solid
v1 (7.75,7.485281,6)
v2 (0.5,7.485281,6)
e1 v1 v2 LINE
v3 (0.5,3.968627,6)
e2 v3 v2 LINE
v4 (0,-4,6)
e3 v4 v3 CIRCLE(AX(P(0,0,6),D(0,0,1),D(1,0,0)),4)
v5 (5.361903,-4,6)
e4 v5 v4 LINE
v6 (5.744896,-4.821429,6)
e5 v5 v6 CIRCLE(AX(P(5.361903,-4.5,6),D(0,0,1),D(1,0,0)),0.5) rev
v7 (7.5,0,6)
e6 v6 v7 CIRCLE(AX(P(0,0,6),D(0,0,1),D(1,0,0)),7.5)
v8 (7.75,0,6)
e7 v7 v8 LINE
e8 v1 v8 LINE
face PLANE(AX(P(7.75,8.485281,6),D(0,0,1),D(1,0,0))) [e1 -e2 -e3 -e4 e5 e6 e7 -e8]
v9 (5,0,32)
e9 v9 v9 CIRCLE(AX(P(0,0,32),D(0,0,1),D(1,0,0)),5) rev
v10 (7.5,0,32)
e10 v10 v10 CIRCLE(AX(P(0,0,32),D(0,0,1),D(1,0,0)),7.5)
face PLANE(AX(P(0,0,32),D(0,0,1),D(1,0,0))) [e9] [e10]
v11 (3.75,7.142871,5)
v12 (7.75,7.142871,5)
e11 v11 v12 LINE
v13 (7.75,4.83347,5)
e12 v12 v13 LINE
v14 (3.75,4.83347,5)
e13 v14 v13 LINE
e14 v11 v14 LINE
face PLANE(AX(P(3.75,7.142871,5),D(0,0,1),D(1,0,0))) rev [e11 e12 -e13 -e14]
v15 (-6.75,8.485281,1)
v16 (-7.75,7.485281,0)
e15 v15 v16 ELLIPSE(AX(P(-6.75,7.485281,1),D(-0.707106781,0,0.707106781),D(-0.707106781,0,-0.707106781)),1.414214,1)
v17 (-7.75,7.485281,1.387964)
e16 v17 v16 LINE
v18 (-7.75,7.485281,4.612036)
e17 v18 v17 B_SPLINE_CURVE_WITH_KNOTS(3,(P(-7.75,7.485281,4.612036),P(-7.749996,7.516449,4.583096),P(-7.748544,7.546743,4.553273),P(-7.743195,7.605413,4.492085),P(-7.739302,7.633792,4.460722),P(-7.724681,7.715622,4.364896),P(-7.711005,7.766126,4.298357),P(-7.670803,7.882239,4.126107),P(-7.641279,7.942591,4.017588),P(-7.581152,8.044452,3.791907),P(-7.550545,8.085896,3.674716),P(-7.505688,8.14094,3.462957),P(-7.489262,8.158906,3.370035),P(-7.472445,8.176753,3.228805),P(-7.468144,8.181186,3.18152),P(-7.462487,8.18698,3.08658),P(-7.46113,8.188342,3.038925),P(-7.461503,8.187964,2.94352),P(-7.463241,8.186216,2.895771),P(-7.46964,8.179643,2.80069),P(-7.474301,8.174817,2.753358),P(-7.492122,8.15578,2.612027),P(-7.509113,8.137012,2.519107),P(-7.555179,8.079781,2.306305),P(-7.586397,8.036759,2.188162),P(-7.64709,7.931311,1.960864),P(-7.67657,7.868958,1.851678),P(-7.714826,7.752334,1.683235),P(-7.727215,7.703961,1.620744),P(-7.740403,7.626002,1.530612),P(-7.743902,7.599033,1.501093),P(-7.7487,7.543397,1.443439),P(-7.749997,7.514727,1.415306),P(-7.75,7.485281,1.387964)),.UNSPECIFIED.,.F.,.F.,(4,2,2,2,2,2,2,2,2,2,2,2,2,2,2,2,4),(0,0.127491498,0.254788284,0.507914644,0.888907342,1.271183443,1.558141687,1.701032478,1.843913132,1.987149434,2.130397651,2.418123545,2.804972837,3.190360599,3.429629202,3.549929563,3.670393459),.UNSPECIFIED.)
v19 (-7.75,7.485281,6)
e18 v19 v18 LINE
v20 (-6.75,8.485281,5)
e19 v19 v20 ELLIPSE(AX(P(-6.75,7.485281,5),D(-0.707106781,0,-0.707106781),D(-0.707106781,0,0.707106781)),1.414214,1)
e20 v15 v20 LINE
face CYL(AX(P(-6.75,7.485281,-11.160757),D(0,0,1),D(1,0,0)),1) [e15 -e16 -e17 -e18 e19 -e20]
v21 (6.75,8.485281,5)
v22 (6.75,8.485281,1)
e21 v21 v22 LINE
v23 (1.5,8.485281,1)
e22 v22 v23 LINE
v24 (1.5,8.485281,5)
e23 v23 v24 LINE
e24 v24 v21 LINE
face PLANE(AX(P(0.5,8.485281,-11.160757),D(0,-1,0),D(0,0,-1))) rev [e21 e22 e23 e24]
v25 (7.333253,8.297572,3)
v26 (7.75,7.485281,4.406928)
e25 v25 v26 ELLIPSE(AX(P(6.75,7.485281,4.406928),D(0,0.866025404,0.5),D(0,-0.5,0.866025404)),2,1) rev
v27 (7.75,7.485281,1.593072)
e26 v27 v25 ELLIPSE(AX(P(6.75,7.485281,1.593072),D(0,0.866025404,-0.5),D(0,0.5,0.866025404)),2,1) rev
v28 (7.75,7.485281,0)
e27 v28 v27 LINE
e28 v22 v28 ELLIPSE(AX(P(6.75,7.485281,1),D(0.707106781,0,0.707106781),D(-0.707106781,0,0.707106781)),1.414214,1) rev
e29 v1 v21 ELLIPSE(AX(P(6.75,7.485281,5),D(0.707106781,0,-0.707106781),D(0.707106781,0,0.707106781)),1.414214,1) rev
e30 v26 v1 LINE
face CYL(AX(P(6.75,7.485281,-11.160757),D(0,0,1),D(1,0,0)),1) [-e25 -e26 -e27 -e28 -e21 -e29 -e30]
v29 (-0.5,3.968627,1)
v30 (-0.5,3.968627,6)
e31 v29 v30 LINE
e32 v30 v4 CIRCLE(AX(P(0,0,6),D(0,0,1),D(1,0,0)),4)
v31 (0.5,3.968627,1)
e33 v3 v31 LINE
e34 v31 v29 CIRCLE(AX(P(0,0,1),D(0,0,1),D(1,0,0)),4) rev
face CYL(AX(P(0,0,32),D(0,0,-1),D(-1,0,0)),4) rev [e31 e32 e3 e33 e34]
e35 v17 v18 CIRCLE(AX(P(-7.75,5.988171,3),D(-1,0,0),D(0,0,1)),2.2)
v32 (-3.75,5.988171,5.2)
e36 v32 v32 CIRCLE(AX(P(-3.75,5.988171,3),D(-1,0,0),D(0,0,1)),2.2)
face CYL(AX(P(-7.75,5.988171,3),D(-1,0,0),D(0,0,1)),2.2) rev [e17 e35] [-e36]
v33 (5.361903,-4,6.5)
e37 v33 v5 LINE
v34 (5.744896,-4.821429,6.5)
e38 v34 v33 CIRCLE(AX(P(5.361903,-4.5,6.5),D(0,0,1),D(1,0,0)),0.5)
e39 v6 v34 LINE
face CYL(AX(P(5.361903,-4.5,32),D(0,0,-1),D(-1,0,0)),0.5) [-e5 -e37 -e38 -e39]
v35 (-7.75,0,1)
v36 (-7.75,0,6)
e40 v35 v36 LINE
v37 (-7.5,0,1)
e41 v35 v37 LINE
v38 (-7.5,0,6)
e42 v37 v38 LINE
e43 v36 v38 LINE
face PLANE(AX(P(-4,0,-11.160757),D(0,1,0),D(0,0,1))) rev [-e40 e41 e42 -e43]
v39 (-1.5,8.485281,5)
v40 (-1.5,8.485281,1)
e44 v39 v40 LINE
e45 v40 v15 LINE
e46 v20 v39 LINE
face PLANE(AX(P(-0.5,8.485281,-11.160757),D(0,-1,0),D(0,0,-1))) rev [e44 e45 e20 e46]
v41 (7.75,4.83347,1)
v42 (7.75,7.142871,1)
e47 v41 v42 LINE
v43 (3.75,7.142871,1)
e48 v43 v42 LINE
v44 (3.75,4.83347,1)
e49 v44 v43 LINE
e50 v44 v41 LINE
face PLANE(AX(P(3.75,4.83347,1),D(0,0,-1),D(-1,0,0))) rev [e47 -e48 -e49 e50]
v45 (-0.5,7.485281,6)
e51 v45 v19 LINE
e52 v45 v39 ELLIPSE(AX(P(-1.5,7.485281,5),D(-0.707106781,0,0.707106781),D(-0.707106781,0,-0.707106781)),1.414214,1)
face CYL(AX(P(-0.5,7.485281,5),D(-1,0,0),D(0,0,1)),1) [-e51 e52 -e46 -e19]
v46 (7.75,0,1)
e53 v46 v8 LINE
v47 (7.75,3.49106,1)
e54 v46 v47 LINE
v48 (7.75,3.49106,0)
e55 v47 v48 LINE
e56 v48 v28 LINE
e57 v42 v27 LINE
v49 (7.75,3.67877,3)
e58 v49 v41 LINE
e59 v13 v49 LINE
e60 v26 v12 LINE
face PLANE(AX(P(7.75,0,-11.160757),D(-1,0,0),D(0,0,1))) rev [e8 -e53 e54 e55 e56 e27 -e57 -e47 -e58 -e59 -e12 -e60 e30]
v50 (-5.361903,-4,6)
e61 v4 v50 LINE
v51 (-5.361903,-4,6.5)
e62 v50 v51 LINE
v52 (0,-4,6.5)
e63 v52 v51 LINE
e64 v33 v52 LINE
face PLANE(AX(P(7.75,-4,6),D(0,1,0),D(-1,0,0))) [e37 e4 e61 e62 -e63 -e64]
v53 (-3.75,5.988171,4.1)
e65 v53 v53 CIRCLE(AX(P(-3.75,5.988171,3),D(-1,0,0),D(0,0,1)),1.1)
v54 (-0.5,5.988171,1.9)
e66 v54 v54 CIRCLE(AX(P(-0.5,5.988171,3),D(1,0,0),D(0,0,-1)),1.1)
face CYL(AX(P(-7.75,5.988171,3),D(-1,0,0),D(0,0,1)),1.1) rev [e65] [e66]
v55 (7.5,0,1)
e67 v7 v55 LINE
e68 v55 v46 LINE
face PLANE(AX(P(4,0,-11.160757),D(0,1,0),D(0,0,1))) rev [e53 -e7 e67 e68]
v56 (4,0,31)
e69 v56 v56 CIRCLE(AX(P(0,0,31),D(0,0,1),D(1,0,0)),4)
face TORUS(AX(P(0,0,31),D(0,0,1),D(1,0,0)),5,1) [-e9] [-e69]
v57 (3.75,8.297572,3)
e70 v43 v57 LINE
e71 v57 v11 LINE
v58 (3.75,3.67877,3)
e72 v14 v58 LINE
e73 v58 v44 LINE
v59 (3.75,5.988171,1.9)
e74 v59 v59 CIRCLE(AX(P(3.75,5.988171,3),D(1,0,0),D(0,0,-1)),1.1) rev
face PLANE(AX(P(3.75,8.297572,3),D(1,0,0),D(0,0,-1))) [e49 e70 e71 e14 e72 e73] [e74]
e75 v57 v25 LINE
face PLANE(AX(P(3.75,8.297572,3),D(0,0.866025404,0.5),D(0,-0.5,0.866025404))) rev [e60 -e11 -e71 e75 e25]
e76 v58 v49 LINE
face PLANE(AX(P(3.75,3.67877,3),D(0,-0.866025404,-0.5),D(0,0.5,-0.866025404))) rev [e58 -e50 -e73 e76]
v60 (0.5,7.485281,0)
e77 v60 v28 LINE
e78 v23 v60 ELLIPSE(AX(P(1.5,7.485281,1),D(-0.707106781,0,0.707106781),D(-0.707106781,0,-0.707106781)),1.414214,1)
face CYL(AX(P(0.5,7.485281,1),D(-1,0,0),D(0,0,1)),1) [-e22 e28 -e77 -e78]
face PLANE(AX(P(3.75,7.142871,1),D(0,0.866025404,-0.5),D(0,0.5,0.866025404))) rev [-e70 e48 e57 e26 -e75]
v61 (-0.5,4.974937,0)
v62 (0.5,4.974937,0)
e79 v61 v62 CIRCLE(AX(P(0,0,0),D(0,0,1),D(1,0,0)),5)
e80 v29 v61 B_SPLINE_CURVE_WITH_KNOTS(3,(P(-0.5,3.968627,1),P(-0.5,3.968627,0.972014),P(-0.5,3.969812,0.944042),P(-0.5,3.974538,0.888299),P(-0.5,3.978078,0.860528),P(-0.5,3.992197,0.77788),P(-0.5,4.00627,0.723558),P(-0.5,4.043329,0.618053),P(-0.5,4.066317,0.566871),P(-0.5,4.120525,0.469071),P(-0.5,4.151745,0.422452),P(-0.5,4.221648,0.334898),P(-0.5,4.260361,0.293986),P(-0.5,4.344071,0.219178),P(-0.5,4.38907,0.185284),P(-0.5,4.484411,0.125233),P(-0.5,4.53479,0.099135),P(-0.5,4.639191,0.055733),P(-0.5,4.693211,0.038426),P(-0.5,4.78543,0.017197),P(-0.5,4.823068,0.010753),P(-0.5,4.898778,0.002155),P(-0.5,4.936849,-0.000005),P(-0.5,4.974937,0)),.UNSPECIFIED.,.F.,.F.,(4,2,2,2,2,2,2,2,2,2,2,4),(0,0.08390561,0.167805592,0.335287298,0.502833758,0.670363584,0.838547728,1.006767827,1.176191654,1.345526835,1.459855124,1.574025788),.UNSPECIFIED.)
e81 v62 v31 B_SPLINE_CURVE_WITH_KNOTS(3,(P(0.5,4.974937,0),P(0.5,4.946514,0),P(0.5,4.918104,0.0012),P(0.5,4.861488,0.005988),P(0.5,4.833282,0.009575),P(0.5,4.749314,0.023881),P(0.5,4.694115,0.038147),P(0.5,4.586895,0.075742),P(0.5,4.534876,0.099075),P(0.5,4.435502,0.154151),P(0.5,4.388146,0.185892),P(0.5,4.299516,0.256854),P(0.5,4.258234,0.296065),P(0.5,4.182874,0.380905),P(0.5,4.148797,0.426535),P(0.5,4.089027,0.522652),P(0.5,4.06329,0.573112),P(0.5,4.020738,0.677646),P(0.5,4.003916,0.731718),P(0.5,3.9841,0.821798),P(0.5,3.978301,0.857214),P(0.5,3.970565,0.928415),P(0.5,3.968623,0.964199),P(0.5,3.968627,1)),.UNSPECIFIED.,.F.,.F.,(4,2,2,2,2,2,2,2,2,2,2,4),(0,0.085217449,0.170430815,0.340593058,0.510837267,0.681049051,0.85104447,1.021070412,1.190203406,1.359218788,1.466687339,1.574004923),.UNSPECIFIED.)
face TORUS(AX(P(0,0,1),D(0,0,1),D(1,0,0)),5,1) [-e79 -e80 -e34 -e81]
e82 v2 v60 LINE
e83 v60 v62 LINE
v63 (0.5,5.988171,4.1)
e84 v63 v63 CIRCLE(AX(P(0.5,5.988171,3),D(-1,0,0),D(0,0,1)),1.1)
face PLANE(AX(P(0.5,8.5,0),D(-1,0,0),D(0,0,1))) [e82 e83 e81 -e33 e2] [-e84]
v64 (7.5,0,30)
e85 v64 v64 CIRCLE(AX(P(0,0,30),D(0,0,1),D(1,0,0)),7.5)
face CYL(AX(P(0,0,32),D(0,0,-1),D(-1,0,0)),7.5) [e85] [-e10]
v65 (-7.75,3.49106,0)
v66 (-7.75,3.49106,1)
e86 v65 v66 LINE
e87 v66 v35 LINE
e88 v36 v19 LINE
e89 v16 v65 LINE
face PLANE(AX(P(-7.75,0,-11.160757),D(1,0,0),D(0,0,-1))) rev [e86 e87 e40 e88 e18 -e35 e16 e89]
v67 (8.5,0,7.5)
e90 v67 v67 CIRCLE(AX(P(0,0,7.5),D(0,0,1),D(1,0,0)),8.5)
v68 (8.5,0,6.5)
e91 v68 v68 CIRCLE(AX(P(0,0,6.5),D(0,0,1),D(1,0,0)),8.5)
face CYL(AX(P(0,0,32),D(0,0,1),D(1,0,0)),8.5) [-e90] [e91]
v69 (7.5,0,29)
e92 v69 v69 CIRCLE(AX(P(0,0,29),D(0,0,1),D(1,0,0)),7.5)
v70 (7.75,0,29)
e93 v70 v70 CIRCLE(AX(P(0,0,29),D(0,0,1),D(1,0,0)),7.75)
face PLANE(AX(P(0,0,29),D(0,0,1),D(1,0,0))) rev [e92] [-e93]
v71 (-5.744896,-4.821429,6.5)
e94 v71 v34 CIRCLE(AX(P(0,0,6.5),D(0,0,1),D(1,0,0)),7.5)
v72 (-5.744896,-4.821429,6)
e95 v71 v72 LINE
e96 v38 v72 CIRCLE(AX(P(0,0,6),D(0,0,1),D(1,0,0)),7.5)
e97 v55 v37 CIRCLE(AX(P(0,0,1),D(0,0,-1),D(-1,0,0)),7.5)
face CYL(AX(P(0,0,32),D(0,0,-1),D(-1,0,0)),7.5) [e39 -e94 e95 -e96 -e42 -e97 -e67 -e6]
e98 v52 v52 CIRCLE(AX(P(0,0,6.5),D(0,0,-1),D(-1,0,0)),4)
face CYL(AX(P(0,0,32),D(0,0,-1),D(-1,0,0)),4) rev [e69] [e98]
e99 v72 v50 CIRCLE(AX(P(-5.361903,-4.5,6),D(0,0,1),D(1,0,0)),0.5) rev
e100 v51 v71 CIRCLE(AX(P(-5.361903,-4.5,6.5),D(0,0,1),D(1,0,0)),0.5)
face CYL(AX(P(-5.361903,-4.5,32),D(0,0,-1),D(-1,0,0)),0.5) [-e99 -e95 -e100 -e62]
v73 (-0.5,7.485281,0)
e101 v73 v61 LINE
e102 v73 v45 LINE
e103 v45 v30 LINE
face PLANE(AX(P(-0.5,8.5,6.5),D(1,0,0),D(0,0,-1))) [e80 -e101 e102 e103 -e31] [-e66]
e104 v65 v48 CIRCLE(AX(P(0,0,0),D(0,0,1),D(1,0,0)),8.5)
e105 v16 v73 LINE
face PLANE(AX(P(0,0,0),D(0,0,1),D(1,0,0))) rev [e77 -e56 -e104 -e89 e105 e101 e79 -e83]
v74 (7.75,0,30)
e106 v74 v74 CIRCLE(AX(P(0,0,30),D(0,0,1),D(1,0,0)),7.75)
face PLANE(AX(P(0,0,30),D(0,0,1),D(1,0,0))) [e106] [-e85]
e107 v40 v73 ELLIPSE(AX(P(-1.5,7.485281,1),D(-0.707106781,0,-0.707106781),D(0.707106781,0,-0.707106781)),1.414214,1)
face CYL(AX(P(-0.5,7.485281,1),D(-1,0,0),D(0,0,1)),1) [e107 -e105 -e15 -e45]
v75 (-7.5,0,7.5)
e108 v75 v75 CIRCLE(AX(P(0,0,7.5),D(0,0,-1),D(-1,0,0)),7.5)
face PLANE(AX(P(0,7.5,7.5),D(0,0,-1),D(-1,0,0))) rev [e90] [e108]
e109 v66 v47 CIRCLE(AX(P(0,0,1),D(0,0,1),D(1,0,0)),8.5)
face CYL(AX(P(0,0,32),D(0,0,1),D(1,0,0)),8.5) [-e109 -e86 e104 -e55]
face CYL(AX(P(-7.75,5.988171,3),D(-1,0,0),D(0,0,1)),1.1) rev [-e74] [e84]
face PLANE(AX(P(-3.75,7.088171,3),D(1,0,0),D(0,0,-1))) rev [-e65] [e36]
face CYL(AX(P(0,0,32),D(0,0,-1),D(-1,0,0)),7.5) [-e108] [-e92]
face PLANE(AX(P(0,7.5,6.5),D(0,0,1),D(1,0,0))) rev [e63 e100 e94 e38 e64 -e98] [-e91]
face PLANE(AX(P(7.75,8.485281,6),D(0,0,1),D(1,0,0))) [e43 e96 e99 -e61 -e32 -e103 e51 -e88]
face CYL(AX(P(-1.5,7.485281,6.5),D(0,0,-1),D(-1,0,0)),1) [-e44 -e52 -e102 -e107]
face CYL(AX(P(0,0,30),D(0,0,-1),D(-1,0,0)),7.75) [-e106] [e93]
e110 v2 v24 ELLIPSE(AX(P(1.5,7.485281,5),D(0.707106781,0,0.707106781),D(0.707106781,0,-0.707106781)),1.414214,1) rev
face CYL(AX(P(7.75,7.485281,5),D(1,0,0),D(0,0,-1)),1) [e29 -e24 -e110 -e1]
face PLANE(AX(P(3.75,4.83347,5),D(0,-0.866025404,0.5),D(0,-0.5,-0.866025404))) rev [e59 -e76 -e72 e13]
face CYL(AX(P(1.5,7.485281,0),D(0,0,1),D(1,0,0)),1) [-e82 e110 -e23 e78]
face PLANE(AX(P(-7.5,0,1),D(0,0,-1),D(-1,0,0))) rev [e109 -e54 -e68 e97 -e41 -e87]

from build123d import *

# Parameters (mm, degrees)
SKETCH1_R                      = 7.5
SKETCH1_R_2                    = 4
BOSS_EXTRUDE1_DEPTH            = 32
SKETCH6_W                      = 1
SKETCH6_H                      = 1
SKETCH7_W                      = 1
SKETCH7_H                      = 1
CUT_EXTRUDE1_DEPTH             = 35.18332927
BOSS_EXTRUDE3_DEPTH            = 6.5
SKETCH15_W                     = 15.5
SKETCH15_H                     = 12.485281374
CUT_EXTRUDE2_DEPTH             = 0.5
CBORE_FOR_M2_SHCS1_D           = 2.2
CBORE_FOR_M2_SHCS1_CBORE_D     = 4.4
CBORE_FOR_M2_SHCS1_CBORE_DEPTH = 4
FILLET4_R                      = 0.5
SKETCH4_R                      = 7.75
SKETCH4_R_2                    = 4
BOSS_EXTRUDE4_DEPTH            = 1
CUT_EXTRUDE3_DEPTH             = 4
FILLET5_R                      = 1


with BuildPart() as part:
    # Sketch1 → Boss-Extrude1 (new body)
    with BuildSketch(Plane.XY):
        Circle(SKETCH1_R)
        Circle(SKETCH1_R_2, mode=Mode.SUBTRACT)
    extrude(amount=BOSS_EXTRUDE1_DEPTH)

    # Sketch6 → Revolve1 (revolve)
    with BuildSketch(Plane(origin=(0, 0, 0), x_dir=(-1, 0, 0), z_dir=(0, 1, 0))):
        with Locations((8, 0.5)):
            Rectangle(SKETCH6_W, SKETCH6_H)
    revolve(axis=Axis((0, 0, 32), (0, 0, -1)))

    # Sketch7 → Revolve2 (revolve)
    with BuildSketch(Plane(origin=(0, 0, 0), x_dir=(0, 0, -1), z_dir=(1, 0, 0)), mode=Mode.PRIVATE) as revolve2_sk:
        with Locations((-7, 8)):
            Rectangle(SKETCH7_W, SKETCH7_H)
    revolve(revolve2_sk.sketch.rotate(Axis((0, 0, 32), (0, 0, -1)), 270), axis=Axis((0, 0, 32), (0, 0, -1)))

    # Sketch9 → Cut-Extrude1 (cut, through all)
    with BuildSketch(Plane(origin=(0, 0, 0), x_dir=(-1, 0, 0), z_dir=(0, 1, 0))):
        Polygon((0, 0), (-0.5, 0), (-0.5, 6.5), (0.5, 6.5), (0.5, 0), align=None)
    extrude(amount=CUT_EXTRUDE1_DEPTH, mode=Mode.SUBTRACT)

    # Sketch12 → Boss-Extrude3 (add)
    with BuildSketch(Plane(origin=(0, 0, 6.5), x_dir=(-1, 0, 0), z_dir=(0, 0, -1))):
        with BuildLine():
            Line((4, 0), (7.75, 0))
            Line((7.75, 0), (7.75, 8.485281374))
            Line((7.75, 8.485281374), (0.5, 8.485281374))
            Line((0.5, 8.485281374), (0.5, 3.968626967))
            ThreePointArc((0.5, 3.968626967), (3, 2.645751311), (4, 0))
        make_face()
        with BuildLine():
            Line((-7.75, 0), (-7.75, 8.485281374))
            Line((-7.75, 8.485281374), (-0.5, 8.485281374))
            Line((-0.5, 8.485281374), (-0.5, 3.968626967))
            ThreePointArc((-0.5, 3.968626967), (-3, 2.645751311), (-4, 0))
            Line((-4, 0), (-7.75, 0))
        make_face()
    extrude(amount=BOSS_EXTRUDE3_DEPTH)

    # Sketch15 → Cut-Extrude2 (cut)
    with BuildSketch(Plane(origin=(0, 0, 6.5), x_dir=(-1, 0, 0), z_dir=(0, 0, -1))):
        with Locations((0, 2.242640687)):
            Rectangle(SKETCH15_W, SKETCH15_H)
    extrude(amount=CUT_EXTRUDE2_DEPTH, mode=Mode.SUBTRACT)

    # CBORE for M2 SHCS1 (through all)
    with Locations(Plane(origin=(-7.75, 5.988170693, 3), x_dir=(0, 0, -1), z_dir=(-1, 0, 0))):
        with Locations((0, 0)):
            CounterBoreHole(CBORE_FOR_M2_SHCS1_D / 2, CBORE_FOR_M2_SHCS1_CBORE_D / 2, CBORE_FOR_M2_SHCS1_CBORE_DEPTH)

    # Fillet4
    fillet4_edges = [part.edges().sort_by_distance(p)[0] for p in [
        (-6.34428877, -4, 6.25),
        (6.34428877, -4, 6.25),
    ]]
    fillet(fillet4_edges, radius=FILLET4_R)

    # Sketch4 → Boss-Extrude4 (add)
    with BuildSketch(Plane.XY.offset(29)):
        Circle(SKETCH4_R)
        with Locations(Location((0, 0, 0), (0, 0, 270))):
            Circle(SKETCH4_R_2, mode=Mode.SUBTRACT)
    extrude(amount=BOSS_EXTRUDE4_DEPTH)

    # Sketch16 → Cut-Extrude3 (cut)
    with BuildSketch(Plane(origin=(7.75, 0, 0), x_dir=(0, 0, -1), z_dir=(1, 0, 0))):
        Polygon((-3, 8.297571769), (-5, 7.142871231), (-5, 4.833470154), (-3, 3.678769616), (-1, 4.833470154), (-1, 7.142871231), align=None)
    extrude(amount=-CUT_EXTRUDE3_DEPTH, mode=Mode.SUBTRACT)

    # Fillet5
    # the kernel refuses this fillet: 1 mm, written as the material it takes off along each edge
    with BuildSketch(Plane(origin=(0.5, 8.485281374, 6), x_dir=(0, -1, 0), z_dir=(0, 0, -1))) as fillet5_piece_1:
        with BuildLine():
            CenterArc((FILLET5_R, -FILLET5_R), FILLET5_R, 90, 90)
            Line((0, -FILLET5_R), (0, 0))
            Line((0, 0), (FILLET5_R, 0))
        make_face()
    extrude(amount=8.5, mode=Mode.SUBTRACT)
    with BuildSketch(Plane(origin=(-2, 8.485281374, 6), x_dir=(0, -1, 0), z_dir=(1, 0, 0)), Plane(origin=(-10.25, 8.485281374, 6), x_dir=(0, -1, 0), z_dir=(1, 0, 0)), Plane(origin=(-10.25, 8.485281374, 0), x_dir=(0, 0, 1), z_dir=(1, 0, 0))) as fillet5_piece_2:
        with BuildLine():
            CenterArc((FILLET5_R, FILLET5_R), FILLET5_R, 180, 90)
            Line((0, FILLET5_R), (0, 0))
            Line((0, 0), (FILLET5_R, 0))
        make_face()
    extrude(amount=12.25, mode=Mode.SUBTRACT)
    with BuildSketch(Plane(origin=(0, 0, 0), x_dir=(0.0031415874858760906, 0.9999950652018582, 0), z_dir=(-0.9999950652018582, 0.0031415874858760906, 0))) as fillet5_piece_3:
        with BuildLine():
            CenterArc((4 + FILLET5_R, -FILLET5_R), FILLET5_R, 90, 90)
            Line((4 + FILLET5_R, 0), (4, 0))
            Line((4, 0), (4, -FILLET5_R))
        make_face()
    revolve(axis=Axis((0, 0, 0), (0, 0, -1)), revolution_arc=359.64, mode=Mode.SUBTRACT)
    with BuildSketch(Plane(origin=(-0.5, 8.485281374, -2.5), x_dir=(-1, 0, 0), z_dir=(0, 0, 1))) as fillet5_piece_4:
        with BuildLine():
            CenterArc((FILLET5_R, FILLET5_R), FILLET5_R, 180, 90)
            Line((0, FILLET5_R), (0, 0))
            Line((0, 0), (FILLET5_R, 0))
        make_face()
    extrude(amount=8.5, mode=Mode.SUBTRACT)
    with BuildSketch(Plane(origin=(0, 0, 32), x_dir=(1, 0, 0), z_dir=(0, -1, 0))) as fillet5_piece_5:
        with BuildLine():
            CenterArc((4 + FILLET5_R, -FILLET5_R), FILLET5_R, 90, 90)
            Line((4 + FILLET5_R, 0), (4, 0))
            Line((4, 0), (4, -FILLET5_R))
        make_face()
    revolve(axis=Axis((0, 0, 32), (0, 0, 1)), mode=Mode.SUBTRACT)
    with BuildSketch(Plane(origin=(-7.75, 8.485281374, 8.5), x_dir=(0, -1, 0), z_dir=(0, 0, -1)), Plane(origin=(7.75, 8.485281374, 8.5), x_dir=(-1, 0, 0), z_dir=(0, 0, -1))) as fillet5_piece_6:
        with BuildLine():
            CenterArc((FILLET5_R, -FILLET5_R), FILLET5_R, 90, 90)
            Line((0, -FILLET5_R), (0, 0))
            Line((0, 0), (FILLET5_R, 0))
        make_face()
    extrude(amount=11, mode=Mode.SUBTRACT)
    with BuildSketch(Plane(origin=(10.25, 8.485281374, 0), x_dir=(0, 0, 1), z_dir=(-1, 0, 0))) as fillet5_piece_7:
        with BuildLine():
            CenterArc((FILLET5_R, -FILLET5_R), FILLET5_R, 90, 90)
            Line((0, -FILLET5_R), (0, 0))
            Line((0, 0), (FILLET5_R, 0))
        make_face()
    extrude(amount=12.25, mode=Mode.SUBTRACT)


solid = part.part
